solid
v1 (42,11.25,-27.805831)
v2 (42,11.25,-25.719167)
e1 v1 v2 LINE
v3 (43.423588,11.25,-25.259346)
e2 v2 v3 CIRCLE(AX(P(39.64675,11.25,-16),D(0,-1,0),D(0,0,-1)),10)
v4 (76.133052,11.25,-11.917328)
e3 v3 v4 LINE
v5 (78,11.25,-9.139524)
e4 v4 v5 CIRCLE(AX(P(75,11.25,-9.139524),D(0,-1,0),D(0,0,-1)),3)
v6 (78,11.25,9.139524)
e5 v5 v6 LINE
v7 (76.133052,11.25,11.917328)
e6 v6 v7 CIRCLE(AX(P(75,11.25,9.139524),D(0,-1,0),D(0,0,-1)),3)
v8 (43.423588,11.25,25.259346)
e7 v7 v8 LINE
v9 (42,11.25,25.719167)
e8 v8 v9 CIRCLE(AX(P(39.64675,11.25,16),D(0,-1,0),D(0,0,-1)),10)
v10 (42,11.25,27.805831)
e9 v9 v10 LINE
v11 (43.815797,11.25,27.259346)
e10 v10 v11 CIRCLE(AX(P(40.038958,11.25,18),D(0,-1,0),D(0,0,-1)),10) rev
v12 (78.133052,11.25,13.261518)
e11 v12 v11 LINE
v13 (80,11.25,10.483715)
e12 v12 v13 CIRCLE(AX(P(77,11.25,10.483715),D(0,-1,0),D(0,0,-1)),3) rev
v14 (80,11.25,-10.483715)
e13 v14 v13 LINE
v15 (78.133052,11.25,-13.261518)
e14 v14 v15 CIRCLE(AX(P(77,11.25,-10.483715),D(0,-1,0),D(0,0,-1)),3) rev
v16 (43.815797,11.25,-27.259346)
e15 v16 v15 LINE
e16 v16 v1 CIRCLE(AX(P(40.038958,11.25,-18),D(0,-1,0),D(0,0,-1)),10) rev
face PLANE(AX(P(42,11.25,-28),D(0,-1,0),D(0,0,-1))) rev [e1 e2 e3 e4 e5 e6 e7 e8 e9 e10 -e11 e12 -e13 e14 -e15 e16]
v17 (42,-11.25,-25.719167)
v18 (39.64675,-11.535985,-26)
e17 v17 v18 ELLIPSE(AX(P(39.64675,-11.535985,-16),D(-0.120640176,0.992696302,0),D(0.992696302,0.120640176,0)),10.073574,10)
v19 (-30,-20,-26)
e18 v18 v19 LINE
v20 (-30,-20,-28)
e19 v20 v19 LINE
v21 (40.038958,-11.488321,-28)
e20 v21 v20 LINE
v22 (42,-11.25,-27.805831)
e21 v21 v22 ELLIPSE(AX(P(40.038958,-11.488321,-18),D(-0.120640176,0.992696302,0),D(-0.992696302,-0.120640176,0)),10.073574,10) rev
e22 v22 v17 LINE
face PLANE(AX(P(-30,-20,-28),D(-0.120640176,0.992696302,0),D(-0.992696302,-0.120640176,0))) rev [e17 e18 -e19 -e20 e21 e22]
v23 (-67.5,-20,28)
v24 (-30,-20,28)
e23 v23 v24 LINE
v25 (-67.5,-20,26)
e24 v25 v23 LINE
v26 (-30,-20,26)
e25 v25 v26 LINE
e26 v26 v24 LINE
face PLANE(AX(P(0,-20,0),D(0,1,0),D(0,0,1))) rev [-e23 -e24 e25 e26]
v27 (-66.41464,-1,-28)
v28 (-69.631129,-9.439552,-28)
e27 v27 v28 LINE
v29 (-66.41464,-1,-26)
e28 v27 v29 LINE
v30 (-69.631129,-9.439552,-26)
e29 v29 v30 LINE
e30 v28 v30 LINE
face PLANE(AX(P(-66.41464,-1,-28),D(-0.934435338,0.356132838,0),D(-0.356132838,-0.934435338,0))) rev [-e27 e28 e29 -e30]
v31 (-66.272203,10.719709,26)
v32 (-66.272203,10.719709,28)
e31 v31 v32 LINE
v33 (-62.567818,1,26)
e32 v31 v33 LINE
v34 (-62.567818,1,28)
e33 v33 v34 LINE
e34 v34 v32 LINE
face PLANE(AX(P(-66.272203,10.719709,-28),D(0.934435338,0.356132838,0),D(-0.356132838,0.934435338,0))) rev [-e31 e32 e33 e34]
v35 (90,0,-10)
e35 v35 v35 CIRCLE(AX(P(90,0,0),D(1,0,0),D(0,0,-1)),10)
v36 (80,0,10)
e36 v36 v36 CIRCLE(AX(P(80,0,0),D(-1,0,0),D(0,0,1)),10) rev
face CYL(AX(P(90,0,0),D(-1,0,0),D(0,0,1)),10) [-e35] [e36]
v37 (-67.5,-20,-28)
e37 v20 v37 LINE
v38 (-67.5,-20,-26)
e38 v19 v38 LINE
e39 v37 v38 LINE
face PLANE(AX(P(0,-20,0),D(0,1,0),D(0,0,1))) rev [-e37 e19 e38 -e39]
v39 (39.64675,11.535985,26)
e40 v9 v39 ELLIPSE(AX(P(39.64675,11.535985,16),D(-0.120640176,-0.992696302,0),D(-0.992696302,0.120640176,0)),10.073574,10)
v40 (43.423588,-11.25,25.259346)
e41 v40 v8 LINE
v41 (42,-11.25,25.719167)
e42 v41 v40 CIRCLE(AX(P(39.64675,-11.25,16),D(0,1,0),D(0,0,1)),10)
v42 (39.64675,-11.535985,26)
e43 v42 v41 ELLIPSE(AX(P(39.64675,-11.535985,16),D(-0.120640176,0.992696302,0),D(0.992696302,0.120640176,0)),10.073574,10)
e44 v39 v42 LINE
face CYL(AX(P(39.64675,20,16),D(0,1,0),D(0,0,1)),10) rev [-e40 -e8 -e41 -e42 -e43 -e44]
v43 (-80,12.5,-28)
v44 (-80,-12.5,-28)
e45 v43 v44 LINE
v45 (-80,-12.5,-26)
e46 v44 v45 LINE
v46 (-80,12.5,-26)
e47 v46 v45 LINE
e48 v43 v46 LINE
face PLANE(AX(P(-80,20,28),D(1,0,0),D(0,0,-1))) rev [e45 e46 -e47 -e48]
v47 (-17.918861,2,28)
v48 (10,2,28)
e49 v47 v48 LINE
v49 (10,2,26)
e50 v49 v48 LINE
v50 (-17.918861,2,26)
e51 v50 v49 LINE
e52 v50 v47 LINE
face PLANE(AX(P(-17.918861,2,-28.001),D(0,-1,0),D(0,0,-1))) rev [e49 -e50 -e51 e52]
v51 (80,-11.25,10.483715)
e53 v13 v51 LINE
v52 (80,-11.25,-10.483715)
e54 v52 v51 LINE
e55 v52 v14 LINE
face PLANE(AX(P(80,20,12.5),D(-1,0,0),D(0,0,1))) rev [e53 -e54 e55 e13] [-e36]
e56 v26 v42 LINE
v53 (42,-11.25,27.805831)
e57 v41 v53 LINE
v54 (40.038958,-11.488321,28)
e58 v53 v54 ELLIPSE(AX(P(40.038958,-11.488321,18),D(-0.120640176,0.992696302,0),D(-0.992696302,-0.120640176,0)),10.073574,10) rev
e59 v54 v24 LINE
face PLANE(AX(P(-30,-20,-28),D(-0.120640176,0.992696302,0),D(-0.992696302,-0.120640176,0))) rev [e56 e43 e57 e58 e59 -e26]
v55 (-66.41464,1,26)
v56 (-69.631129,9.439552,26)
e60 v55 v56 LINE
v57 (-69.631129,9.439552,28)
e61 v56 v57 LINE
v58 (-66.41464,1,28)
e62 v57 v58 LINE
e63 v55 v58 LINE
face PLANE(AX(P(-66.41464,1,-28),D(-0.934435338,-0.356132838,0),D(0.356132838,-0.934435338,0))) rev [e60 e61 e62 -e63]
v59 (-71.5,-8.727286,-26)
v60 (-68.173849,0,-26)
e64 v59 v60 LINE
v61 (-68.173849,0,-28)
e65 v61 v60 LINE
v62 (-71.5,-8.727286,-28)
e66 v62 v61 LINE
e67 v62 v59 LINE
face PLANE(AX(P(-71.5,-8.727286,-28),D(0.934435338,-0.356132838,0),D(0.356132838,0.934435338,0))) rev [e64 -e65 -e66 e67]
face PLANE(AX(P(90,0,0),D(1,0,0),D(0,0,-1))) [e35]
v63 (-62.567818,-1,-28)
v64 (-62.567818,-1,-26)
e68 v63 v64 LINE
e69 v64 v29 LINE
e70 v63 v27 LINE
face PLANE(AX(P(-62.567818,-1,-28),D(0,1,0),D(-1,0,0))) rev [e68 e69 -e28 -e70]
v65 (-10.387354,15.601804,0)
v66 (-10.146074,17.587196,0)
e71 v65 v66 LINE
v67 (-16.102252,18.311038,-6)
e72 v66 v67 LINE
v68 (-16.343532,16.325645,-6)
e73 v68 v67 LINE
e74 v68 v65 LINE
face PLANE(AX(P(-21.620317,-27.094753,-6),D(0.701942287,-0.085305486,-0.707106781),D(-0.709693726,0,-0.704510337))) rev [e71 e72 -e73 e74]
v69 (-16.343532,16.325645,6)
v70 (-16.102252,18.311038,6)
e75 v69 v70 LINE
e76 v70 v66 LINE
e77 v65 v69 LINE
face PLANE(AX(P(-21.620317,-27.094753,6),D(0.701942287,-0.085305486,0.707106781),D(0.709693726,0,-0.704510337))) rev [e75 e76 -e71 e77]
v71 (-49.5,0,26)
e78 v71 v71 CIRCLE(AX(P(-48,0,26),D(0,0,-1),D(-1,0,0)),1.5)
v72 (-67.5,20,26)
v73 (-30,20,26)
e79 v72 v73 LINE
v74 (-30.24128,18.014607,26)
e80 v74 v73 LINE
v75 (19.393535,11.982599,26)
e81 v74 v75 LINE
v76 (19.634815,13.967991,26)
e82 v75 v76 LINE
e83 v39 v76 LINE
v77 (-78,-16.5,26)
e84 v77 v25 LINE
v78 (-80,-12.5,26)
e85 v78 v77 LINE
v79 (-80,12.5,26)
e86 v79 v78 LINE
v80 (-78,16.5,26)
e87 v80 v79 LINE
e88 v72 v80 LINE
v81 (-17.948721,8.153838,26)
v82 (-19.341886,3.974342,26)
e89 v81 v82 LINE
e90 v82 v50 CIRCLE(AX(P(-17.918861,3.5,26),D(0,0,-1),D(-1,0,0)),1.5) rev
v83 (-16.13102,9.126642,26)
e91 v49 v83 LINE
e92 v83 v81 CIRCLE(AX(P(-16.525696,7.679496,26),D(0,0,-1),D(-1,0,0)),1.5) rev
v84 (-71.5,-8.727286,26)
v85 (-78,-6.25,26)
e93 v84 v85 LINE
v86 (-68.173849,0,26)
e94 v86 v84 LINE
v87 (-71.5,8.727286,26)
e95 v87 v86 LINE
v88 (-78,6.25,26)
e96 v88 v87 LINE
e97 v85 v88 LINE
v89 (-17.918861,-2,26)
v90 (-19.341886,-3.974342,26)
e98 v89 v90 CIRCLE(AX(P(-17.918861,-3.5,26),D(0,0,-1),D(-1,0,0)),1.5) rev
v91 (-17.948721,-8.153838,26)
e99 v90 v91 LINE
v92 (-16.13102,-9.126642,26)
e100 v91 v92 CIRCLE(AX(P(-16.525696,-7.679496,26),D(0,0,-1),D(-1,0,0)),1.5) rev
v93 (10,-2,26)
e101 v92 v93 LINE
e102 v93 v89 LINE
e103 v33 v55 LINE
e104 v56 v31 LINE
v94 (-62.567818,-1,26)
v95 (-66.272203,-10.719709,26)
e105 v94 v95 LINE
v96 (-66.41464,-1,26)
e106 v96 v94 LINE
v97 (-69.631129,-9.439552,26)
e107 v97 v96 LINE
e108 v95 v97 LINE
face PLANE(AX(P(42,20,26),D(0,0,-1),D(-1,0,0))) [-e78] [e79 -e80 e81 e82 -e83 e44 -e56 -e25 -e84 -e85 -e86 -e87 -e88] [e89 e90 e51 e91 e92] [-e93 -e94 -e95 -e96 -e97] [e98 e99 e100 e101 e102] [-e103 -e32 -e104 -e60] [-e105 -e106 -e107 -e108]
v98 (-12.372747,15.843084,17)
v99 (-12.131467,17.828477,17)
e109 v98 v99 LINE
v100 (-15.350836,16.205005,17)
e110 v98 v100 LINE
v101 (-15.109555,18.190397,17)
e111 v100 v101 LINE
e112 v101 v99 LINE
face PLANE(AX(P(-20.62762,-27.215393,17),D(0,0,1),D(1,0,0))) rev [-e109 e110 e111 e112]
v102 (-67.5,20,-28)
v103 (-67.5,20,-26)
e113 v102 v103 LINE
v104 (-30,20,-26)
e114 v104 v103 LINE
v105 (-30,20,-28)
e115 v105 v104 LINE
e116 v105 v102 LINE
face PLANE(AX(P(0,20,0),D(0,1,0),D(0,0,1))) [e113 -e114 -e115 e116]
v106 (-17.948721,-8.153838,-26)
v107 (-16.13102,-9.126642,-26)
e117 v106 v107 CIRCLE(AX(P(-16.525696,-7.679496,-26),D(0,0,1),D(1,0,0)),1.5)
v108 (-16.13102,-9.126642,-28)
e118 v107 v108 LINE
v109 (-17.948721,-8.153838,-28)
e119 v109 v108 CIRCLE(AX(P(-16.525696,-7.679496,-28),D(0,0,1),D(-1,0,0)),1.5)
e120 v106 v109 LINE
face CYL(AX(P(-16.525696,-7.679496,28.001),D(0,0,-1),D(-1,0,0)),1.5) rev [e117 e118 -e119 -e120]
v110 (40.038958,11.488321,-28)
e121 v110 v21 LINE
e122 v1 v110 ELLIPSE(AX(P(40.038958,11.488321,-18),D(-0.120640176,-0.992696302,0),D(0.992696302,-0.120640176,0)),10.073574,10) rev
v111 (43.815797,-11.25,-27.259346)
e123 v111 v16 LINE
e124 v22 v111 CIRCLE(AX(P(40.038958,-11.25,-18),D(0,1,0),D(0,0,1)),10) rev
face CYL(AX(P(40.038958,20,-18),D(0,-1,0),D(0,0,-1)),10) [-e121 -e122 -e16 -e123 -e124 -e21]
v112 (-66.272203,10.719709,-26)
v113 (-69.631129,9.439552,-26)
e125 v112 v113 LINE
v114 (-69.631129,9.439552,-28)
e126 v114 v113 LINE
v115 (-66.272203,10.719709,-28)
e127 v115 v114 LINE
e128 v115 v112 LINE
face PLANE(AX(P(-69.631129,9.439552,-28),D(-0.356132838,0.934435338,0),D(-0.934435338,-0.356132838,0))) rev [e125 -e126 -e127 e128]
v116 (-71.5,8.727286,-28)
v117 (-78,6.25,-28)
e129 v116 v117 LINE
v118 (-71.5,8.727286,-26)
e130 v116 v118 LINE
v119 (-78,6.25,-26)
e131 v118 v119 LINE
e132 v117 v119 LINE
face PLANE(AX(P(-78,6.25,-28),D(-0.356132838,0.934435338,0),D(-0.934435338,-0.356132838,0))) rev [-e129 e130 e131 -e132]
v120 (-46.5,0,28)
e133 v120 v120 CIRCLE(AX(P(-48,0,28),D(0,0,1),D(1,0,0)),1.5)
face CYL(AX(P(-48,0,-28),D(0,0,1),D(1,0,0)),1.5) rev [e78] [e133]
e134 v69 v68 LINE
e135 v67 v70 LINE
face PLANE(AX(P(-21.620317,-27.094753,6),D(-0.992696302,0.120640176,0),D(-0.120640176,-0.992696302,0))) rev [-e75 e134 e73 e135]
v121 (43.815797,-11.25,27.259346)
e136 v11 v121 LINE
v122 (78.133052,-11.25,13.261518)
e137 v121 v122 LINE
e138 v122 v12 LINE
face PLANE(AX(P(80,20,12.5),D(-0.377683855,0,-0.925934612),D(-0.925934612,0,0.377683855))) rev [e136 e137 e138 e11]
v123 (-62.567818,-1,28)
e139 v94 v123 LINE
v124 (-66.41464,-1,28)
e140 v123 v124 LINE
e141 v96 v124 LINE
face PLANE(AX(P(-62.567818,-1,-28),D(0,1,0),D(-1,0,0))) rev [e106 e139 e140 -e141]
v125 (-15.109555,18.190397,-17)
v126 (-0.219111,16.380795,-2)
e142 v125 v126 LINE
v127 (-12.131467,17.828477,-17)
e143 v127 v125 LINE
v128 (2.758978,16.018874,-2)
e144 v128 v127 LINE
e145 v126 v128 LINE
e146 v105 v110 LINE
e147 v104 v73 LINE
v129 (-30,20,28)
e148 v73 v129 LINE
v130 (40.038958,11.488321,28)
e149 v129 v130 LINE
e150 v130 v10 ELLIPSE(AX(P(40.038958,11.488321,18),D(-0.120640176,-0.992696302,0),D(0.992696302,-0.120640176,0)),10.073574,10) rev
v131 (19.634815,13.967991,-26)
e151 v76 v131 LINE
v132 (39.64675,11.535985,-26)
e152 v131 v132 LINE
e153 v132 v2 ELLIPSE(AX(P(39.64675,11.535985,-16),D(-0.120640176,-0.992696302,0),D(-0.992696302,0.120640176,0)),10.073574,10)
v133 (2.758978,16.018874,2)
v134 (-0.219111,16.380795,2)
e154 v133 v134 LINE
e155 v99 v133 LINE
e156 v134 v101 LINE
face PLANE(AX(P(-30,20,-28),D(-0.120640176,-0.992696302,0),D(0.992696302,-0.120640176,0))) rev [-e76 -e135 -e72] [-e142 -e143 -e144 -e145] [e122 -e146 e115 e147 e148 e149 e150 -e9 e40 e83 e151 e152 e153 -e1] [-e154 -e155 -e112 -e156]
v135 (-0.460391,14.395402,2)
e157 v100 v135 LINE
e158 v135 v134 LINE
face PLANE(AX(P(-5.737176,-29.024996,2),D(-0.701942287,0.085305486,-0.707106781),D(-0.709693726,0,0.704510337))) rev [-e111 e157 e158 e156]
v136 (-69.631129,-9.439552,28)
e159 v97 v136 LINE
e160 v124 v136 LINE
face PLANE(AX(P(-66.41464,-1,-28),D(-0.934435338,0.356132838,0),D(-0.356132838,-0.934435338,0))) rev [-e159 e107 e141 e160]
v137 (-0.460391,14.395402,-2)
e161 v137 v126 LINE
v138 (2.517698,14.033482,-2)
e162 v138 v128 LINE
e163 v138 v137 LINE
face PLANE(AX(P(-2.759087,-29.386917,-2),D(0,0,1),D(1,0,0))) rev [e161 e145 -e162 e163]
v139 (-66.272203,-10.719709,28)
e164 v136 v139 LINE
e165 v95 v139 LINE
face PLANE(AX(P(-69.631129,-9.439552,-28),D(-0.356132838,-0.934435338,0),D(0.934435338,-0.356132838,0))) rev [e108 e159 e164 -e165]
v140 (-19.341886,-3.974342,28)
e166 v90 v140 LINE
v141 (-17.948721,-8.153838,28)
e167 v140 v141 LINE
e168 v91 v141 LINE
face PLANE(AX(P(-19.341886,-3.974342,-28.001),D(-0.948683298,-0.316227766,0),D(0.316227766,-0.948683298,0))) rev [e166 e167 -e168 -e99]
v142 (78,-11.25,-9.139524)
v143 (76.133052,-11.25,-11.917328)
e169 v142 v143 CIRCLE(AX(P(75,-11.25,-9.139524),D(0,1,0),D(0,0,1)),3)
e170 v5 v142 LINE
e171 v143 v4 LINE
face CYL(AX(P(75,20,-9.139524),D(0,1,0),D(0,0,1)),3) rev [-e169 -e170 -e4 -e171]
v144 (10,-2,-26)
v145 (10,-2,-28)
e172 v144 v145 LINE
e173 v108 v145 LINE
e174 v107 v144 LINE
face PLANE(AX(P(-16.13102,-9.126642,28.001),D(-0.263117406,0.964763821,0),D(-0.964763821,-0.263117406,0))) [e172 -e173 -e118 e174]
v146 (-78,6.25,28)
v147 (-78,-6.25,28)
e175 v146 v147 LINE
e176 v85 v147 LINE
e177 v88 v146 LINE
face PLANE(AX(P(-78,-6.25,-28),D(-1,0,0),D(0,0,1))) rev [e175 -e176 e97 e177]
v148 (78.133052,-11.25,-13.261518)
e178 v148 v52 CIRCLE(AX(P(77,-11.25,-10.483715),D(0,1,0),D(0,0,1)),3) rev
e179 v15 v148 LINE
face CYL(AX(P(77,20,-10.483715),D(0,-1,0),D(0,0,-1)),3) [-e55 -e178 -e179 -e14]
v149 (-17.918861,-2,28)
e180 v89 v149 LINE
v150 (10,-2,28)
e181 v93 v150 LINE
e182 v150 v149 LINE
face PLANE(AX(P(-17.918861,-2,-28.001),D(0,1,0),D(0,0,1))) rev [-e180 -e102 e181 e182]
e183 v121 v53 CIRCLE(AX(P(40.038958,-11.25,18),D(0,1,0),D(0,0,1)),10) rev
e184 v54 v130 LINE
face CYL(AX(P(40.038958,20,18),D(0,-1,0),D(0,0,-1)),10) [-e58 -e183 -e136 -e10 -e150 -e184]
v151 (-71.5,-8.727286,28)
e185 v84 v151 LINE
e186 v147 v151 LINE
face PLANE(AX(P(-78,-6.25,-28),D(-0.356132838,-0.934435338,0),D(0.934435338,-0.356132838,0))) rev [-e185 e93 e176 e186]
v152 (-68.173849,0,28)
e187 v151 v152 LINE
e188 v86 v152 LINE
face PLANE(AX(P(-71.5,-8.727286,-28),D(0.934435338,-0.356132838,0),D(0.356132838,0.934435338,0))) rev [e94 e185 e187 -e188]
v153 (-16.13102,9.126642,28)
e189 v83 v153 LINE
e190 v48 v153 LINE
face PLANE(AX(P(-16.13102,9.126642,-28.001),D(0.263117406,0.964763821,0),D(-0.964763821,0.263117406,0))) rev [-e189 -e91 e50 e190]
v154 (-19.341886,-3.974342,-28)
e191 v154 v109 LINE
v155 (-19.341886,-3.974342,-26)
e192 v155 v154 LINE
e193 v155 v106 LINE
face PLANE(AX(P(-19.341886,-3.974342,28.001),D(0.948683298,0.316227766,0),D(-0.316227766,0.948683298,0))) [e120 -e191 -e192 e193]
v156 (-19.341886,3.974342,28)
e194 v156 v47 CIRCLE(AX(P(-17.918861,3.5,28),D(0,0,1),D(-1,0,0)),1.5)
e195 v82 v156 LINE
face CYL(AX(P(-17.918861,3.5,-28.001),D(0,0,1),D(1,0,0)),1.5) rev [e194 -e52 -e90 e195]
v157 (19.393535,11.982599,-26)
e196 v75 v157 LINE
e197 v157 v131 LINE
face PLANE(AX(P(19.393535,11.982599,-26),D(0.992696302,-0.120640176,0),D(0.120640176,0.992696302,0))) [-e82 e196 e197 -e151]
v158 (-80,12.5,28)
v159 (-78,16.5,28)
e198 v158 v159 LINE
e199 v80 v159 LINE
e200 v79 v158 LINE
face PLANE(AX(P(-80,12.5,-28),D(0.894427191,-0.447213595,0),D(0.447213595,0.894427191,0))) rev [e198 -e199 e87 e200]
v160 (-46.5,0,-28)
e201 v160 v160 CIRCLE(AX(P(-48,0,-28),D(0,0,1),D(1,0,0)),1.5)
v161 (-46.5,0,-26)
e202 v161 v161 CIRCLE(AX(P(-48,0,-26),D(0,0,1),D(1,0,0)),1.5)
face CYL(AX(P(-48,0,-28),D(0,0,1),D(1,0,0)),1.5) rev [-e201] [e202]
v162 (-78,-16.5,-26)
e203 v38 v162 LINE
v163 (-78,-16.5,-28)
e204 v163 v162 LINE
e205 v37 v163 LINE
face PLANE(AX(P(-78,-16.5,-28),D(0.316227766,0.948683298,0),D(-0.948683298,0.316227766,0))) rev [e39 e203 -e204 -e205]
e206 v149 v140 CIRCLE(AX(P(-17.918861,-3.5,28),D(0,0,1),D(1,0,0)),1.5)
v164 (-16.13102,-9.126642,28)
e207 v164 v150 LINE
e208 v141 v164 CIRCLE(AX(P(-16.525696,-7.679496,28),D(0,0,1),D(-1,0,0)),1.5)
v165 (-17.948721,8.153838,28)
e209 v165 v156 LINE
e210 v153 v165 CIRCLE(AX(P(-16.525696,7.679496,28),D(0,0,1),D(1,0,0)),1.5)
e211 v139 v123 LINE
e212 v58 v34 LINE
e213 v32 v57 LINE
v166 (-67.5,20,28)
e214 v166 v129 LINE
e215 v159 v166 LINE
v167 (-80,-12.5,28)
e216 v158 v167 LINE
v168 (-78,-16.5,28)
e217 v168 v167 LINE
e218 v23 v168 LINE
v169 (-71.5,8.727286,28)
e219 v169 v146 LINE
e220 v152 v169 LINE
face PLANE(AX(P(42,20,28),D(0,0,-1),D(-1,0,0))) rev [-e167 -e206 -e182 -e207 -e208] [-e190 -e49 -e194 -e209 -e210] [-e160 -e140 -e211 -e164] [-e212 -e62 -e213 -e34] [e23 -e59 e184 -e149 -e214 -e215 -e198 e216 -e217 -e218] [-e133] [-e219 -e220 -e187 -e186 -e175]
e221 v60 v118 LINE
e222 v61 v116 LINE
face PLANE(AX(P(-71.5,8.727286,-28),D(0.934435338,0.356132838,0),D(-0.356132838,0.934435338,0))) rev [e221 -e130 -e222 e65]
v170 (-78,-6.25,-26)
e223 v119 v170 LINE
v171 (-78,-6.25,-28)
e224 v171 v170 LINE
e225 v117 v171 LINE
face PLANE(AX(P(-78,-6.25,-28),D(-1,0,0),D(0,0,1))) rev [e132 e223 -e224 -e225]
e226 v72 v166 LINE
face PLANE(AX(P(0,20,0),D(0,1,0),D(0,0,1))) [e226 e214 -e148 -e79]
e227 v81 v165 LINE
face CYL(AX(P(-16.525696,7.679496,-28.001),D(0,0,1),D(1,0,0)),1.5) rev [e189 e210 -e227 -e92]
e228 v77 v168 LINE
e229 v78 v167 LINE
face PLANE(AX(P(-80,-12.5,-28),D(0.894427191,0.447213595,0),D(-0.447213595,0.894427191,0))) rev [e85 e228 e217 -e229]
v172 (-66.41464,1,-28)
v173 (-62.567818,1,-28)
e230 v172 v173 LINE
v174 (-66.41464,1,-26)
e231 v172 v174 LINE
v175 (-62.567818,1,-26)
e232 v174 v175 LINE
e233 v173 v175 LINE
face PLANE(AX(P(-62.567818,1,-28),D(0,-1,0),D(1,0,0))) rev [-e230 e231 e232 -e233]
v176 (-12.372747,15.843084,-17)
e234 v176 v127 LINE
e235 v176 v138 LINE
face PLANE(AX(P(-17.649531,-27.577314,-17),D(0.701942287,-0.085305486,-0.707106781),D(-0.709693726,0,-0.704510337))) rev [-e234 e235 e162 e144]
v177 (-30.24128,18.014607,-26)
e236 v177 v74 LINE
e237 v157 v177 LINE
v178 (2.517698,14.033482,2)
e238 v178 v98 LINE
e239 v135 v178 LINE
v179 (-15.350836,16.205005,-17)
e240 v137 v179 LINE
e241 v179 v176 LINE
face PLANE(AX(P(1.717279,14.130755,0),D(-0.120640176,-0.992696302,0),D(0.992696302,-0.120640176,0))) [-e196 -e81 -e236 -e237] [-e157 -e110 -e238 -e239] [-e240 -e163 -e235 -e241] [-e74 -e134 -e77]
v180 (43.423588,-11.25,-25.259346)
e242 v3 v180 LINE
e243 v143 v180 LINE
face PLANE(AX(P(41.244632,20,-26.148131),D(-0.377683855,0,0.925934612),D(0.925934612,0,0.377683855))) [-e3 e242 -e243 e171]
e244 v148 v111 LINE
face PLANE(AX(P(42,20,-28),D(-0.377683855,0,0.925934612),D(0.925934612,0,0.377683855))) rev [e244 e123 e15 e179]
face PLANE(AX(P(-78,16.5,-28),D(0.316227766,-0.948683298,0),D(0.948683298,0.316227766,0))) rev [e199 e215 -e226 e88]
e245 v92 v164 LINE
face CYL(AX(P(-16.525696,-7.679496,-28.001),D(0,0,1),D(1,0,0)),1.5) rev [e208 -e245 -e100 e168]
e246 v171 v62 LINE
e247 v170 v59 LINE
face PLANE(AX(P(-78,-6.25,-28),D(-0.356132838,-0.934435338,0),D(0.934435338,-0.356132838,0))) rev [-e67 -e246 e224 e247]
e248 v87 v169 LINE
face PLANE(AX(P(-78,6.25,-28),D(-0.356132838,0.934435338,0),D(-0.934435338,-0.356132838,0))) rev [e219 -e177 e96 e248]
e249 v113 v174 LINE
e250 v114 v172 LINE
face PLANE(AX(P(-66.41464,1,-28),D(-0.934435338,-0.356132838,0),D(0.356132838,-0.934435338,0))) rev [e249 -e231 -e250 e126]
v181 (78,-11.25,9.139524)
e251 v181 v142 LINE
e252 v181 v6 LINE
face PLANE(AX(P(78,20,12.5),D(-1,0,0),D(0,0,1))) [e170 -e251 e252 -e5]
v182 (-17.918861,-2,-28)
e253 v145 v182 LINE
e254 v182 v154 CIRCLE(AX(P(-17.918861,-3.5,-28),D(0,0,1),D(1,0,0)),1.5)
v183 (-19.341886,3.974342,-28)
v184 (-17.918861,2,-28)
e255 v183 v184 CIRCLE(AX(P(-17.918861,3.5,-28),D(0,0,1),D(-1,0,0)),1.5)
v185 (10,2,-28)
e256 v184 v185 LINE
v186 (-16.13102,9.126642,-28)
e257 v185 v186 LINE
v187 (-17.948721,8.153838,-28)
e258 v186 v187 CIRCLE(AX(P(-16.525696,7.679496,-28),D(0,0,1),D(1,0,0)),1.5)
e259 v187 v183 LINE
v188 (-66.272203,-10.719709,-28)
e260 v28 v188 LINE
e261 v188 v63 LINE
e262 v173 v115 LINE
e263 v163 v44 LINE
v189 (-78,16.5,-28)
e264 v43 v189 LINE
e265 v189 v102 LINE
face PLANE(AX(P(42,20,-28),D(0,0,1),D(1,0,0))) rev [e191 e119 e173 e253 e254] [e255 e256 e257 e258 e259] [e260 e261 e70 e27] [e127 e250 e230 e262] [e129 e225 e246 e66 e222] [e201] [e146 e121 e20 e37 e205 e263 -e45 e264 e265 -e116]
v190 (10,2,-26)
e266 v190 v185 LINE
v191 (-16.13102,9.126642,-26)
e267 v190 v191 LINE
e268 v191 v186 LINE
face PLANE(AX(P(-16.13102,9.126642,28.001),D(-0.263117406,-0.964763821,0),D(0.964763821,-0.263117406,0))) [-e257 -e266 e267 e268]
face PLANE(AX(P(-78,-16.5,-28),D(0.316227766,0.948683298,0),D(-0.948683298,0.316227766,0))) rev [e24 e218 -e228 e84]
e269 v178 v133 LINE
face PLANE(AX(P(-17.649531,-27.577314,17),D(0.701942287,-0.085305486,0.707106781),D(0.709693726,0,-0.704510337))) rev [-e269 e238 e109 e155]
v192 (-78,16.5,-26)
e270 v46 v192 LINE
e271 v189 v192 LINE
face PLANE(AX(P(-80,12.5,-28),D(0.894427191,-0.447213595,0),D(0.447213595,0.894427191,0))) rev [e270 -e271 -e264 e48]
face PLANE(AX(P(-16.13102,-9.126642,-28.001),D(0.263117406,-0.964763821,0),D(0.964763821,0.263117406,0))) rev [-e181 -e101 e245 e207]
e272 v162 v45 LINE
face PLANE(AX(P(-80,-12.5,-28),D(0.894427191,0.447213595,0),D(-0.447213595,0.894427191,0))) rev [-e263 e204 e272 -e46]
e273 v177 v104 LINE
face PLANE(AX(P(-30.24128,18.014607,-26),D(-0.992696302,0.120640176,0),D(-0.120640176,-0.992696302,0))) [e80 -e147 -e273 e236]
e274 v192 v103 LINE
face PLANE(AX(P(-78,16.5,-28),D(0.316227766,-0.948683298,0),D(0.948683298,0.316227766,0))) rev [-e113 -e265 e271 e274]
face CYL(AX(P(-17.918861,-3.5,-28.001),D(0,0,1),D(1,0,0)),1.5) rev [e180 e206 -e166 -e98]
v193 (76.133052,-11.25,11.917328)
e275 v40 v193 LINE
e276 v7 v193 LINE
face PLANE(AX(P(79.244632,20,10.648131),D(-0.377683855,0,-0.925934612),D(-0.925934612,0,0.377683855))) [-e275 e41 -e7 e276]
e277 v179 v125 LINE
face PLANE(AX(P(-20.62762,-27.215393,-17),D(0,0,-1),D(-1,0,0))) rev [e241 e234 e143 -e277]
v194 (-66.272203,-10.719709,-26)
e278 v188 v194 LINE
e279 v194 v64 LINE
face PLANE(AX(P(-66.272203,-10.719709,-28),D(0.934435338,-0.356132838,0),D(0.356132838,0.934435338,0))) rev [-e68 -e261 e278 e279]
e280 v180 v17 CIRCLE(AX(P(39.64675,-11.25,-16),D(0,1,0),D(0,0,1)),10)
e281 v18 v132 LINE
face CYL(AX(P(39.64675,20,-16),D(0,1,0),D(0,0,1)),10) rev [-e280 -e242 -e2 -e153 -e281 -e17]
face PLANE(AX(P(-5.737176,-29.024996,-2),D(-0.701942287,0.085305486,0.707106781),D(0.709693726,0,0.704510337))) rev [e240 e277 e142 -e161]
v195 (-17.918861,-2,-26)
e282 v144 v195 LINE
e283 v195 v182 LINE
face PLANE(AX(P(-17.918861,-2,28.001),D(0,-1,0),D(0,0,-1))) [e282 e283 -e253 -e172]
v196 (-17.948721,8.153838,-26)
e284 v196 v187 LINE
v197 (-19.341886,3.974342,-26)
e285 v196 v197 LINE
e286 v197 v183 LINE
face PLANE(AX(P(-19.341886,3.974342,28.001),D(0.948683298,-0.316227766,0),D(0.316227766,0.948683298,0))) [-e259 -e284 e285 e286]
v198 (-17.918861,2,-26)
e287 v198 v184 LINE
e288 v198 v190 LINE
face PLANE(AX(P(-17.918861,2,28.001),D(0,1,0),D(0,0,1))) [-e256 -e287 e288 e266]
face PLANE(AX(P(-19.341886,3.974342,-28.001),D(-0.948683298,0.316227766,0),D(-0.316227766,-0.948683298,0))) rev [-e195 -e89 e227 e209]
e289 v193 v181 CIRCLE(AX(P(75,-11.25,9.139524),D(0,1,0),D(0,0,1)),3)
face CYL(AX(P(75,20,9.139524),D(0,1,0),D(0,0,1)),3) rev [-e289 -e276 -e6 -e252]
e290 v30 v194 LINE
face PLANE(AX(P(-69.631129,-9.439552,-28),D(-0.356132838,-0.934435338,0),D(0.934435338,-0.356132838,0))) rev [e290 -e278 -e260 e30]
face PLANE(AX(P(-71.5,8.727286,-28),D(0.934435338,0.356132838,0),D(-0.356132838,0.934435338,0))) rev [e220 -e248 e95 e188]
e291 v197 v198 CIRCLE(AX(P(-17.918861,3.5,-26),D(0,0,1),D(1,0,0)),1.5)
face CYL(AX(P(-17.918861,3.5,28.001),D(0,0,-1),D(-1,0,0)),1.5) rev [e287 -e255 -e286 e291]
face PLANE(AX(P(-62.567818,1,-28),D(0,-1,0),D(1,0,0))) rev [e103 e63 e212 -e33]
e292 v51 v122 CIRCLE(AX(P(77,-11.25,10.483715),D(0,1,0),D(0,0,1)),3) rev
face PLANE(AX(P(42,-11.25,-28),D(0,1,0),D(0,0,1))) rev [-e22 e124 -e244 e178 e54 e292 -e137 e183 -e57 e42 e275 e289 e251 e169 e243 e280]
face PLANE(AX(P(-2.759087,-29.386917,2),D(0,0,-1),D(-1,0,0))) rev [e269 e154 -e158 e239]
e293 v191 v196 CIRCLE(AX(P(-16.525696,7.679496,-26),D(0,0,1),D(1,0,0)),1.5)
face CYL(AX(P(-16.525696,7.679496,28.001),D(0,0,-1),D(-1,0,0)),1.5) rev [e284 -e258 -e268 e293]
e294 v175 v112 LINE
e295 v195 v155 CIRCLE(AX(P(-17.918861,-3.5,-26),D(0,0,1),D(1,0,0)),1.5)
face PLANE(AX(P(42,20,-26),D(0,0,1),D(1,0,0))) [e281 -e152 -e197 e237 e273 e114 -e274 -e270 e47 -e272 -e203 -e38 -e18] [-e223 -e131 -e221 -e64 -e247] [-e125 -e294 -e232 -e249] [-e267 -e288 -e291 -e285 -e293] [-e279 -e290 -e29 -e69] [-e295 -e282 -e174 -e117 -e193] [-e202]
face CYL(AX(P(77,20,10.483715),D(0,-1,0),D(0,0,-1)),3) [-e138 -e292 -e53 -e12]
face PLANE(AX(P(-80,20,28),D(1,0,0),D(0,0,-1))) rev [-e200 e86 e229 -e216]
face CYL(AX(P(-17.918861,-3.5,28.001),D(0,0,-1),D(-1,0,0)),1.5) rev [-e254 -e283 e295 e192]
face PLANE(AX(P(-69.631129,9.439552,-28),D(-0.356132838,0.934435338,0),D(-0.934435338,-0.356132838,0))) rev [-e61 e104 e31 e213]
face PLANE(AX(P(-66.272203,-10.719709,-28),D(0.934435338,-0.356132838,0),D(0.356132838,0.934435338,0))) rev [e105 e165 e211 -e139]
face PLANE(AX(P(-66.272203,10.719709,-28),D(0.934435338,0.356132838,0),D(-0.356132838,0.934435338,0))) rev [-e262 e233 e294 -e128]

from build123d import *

# Parameters (mm, degrees)
EXTRUDE_1_DEPTH     = 20
SHELL_1_T           = -2
CUT_EXTRUDE_1_DEPTH = 100.679486355
FILLET_1_R          = 10
FILLET_2_R          = 3
SKETCH_3_W          = 50
SKETCH_3_H          = 52
EXTRUDE_2_DEPTH     = 2
SKETCH_4_R          = 10
EXTRUDE_3_DEPTH     = 10
SKETCH_5_R          = 1.5
CUT_EXTRUDE_2_DEPTH = 108.870292481
CUT_EXTRUDE_3_DEPTH = 100.19511746
CUT_EXTRUDE_4_REACH = 109.87
CUT_EXTRUDE_5_DEPTH = 108.870292481


with BuildPart() as part:
    # 草图1 → 凸台-拉伸1 (new, symmetric)
    with BuildSketch(Plane(origin=(0, 0, 0), x_dir=(1, 0, 0), z_dir=(0, 1, 0))):
        Polygon((42, -28), (-80, -28), (-80, 28), (42, 28), (80, 12.5), (80, -12.5), align=None)
    extrude(amount=EXTRUDE_1_DEPTH, both=True)

    # 抽壳1
    shell_1_openings = [part.faces().sort_by_distance(p)[0] for p in [
        (-80, 0, 0),
        (-4.737705571, -20, 0),
        (-4.737705571, 20, 0),
    ]]
    offset(amount=SHELL_1_T, openings=shell_1_openings, kind=Kind.INTERSECTION)

    # 草图2 → 切除-拉伸1 (cut, through all)
    with BuildSketch(Plane.XY.offset(28)):
        Polygon((-80, 12.5), (-78, 16.5), (-67.5, 20), (-80, 20), align=None)
        Polygon((-80, -12.5), (-78, -16.5), (-67.5, -20), (-80, -20), align=None)
        Polygon((-30, 20), (42, 11.25), (80, 11.25), (80, 20), align=None)
        Polygon((42, -11.25), (80, -11.25), (80, -20), (-30, -20), align=None)
    extrude(amount=-CUT_EXTRUDE_1_DEPTH, mode=Mode.SUBTRACT)

    # 圆角1
    fillet_1_edges = [part.edges().sort_by_distance(p)[0] for p in [
        (41.607791612, 0, 26),
        (41.607791612, 0, -26),
    ]]
    fillet(fillet_1_edges, radius=FILLET_1_R)
    fillet_1_2_edges = [part.edges().sort_by_distance(p)[0] for p in [
        (42, 0, -28),
        (42, 0, 28),
    ]]
    fillet(fillet_1_2_edges, radius=FILLET_1_R)

    # 圆角2
    fillet_2_edges = [part.edges().sort_by_distance(p)[0] for p in [
        (78, 0, 11.155809736),
        (78, 0, -11.155809736),
        (80, 0, 12.5),
        (80, 0, -12.5),
    ]]
    fillet(fillet_2_edges, radius=FILLET_2_R)

    # 草图3 → 凸台-拉伸2 (add)
    with BuildSketch(Plane(origin=(1.958559565, 16.116147275, 0), x_dir=(0.9926963020144297, -0.12064017559203144, 0), z_dir=(0.12064017559203145, 0.9926963020144298, 0))):
        with Locations((-7.193692572, 0)):
            Rectangle(SKETCH_3_W, SKETCH_3_H)
    extrude(amount=-EXTRUDE_2_DEPTH)

    # 草图4 → 凸台-拉伸3 (add)
    with BuildSketch(Plane(origin=(80, 0, 0), x_dir=(0, 0, -1), z_dir=(1, 0, 0))):
        Circle(SKETCH_4_R)
    extrude(amount=EXTRUDE_3_DEPTH)

    # 草图5 → 切除-拉伸2 (cut, through all)
    with BuildSketch(Plane.XY.offset(28)):
        with Locations((-48, 0)):
            Circle(SKETCH_5_R)
    extrude(amount=-CUT_EXTRUDE_2_DEPTH, mode=Mode.SUBTRACT)

    # 草图6 → 切除-拉伸3 (cut, through all)
    with BuildSketch(Plane(origin=(1.958559565, 16.116147275, 0), x_dir=(0.9926963020144297, -0.12064017559203144, 0), z_dir=(0.12064017559203145, 0.9926963020144298, 0))):
        Polygon((-18.193692572, -6), (-18.193692572, 6), (-12.193692572, 0), align=None)
        Polygon((-2.193692572, 2), (-17.193692572, 17), (-14.193692572, 17), (0.806307428, 2), align=None)
        Polygon((-14.193692572, -17), (0.806307428, -2), (-2.193692572, -2), (-17.193692572, -17), align=None)
    extrude(amount=-CUT_EXTRUDE_3_DEPTH, mode=Mode.SUBTRACT)

    # 草图7 → 切除-拉伸4 (cut, up to next)
    with BuildSketch(Plane.XY.offset(28), mode=Mode.PRIVATE) as cut_extrude_4_sk1:
        with BuildLine():
            Line((-17.91886117, 2), (10, 2))
            Line((10, 2), (-16.131019724, 9.126641743))
            ThreePointArc((-16.131019724, 9.126641743), (-17.233482721, 9.002007909), (-17.94872078, 8.15383766))
            Line((-17.94872078, 8.15383766), (-19.341886117, 3.974341649))
            ThreePointArc((-19.341886117, 3.974341649), (-19.135724448, 2.622934573), (-17.91886117, 2))
        make_face()
    cut_extrude_4_tool1 = extrude(cut_extrude_4_sk1.sketch, amount=-CUT_EXTRUDE_4_REACH, mode=Mode.PRIVATE) & part.part
    # 草图7 → 切除-拉伸4 (cut, up to next)
    with BuildSketch(Plane.XY.offset(28), mode=Mode.PRIVATE) as cut_extrude_4_sk2:
        with BuildLine():
            Line((-19.341886117, -3.974341649), (-17.94872078, -8.15383766))
            ThreePointArc((-17.94872078, -8.15383766), (-17.233482721, -9.002007909), (-16.131019724, -9.126641743))
            Line((-16.131019724, -9.126641743), (10, -2))
            Line((10, -2), (-17.91886117, -2))
            ThreePointArc((-17.91886117, -2), (-19.135724448, -2.622934573), (-19.341886117, -3.974341649))
        make_face()
    cut_extrude_4_tool2 = extrude(cut_extrude_4_sk2.sketch, amount=-CUT_EXTRUDE_4_REACH, mode=Mode.PRIVATE) & part.part
    cut_extrude_4_1 = cut_extrude_4_tool1.solids().sort_by_distance((-9.044619, 4.500562, 28))[0]
    add(cut_extrude_4_1, mode=Mode.SUBTRACT)
    cut_extrude_4_2 = cut_extrude_4_tool2.solids().sort_by_distance((-9.044619, -4.500562, 28))[0]
    add(cut_extrude_4_2, mode=Mode.SUBTRACT)
    cut_extrude_4 = cut_extrude_4_1 + cut_extrude_4_2  # 切除-拉伸4 as one shape, for the pattern or mirror that repeats it

    # 镜向1: 切除-拉伸4 across plane
    add(cut_extrude_4.mirror(Plane.XY), mode=Mode.SUBTRACT)

    # 草图8 → 切除-拉伸5 (cut, through all)
    with BuildSketch(Plane.XY.offset(28)):
        Polygon((-78, -6.25), (-78, 6.25), (-71.5, 8.727285854), (-68.173848955, 0), (-71.5, -8.727285854), align=None)
        Polygon((-66.414639843, 1), (-69.631129323, 9.43955153), (-66.272202597, 10.719708709), (-62.56781846, 1), align=None)
        Polygon((-66.272202597, -10.719708709), (-62.56781846, -1), (-66.414639843, -1), (-69.631129323, -9.43955153), align=None)
    extrude(amount=-CUT_EXTRUDE_5_DEPTH, mode=Mode.SUBTRACT)


solid = part.part
